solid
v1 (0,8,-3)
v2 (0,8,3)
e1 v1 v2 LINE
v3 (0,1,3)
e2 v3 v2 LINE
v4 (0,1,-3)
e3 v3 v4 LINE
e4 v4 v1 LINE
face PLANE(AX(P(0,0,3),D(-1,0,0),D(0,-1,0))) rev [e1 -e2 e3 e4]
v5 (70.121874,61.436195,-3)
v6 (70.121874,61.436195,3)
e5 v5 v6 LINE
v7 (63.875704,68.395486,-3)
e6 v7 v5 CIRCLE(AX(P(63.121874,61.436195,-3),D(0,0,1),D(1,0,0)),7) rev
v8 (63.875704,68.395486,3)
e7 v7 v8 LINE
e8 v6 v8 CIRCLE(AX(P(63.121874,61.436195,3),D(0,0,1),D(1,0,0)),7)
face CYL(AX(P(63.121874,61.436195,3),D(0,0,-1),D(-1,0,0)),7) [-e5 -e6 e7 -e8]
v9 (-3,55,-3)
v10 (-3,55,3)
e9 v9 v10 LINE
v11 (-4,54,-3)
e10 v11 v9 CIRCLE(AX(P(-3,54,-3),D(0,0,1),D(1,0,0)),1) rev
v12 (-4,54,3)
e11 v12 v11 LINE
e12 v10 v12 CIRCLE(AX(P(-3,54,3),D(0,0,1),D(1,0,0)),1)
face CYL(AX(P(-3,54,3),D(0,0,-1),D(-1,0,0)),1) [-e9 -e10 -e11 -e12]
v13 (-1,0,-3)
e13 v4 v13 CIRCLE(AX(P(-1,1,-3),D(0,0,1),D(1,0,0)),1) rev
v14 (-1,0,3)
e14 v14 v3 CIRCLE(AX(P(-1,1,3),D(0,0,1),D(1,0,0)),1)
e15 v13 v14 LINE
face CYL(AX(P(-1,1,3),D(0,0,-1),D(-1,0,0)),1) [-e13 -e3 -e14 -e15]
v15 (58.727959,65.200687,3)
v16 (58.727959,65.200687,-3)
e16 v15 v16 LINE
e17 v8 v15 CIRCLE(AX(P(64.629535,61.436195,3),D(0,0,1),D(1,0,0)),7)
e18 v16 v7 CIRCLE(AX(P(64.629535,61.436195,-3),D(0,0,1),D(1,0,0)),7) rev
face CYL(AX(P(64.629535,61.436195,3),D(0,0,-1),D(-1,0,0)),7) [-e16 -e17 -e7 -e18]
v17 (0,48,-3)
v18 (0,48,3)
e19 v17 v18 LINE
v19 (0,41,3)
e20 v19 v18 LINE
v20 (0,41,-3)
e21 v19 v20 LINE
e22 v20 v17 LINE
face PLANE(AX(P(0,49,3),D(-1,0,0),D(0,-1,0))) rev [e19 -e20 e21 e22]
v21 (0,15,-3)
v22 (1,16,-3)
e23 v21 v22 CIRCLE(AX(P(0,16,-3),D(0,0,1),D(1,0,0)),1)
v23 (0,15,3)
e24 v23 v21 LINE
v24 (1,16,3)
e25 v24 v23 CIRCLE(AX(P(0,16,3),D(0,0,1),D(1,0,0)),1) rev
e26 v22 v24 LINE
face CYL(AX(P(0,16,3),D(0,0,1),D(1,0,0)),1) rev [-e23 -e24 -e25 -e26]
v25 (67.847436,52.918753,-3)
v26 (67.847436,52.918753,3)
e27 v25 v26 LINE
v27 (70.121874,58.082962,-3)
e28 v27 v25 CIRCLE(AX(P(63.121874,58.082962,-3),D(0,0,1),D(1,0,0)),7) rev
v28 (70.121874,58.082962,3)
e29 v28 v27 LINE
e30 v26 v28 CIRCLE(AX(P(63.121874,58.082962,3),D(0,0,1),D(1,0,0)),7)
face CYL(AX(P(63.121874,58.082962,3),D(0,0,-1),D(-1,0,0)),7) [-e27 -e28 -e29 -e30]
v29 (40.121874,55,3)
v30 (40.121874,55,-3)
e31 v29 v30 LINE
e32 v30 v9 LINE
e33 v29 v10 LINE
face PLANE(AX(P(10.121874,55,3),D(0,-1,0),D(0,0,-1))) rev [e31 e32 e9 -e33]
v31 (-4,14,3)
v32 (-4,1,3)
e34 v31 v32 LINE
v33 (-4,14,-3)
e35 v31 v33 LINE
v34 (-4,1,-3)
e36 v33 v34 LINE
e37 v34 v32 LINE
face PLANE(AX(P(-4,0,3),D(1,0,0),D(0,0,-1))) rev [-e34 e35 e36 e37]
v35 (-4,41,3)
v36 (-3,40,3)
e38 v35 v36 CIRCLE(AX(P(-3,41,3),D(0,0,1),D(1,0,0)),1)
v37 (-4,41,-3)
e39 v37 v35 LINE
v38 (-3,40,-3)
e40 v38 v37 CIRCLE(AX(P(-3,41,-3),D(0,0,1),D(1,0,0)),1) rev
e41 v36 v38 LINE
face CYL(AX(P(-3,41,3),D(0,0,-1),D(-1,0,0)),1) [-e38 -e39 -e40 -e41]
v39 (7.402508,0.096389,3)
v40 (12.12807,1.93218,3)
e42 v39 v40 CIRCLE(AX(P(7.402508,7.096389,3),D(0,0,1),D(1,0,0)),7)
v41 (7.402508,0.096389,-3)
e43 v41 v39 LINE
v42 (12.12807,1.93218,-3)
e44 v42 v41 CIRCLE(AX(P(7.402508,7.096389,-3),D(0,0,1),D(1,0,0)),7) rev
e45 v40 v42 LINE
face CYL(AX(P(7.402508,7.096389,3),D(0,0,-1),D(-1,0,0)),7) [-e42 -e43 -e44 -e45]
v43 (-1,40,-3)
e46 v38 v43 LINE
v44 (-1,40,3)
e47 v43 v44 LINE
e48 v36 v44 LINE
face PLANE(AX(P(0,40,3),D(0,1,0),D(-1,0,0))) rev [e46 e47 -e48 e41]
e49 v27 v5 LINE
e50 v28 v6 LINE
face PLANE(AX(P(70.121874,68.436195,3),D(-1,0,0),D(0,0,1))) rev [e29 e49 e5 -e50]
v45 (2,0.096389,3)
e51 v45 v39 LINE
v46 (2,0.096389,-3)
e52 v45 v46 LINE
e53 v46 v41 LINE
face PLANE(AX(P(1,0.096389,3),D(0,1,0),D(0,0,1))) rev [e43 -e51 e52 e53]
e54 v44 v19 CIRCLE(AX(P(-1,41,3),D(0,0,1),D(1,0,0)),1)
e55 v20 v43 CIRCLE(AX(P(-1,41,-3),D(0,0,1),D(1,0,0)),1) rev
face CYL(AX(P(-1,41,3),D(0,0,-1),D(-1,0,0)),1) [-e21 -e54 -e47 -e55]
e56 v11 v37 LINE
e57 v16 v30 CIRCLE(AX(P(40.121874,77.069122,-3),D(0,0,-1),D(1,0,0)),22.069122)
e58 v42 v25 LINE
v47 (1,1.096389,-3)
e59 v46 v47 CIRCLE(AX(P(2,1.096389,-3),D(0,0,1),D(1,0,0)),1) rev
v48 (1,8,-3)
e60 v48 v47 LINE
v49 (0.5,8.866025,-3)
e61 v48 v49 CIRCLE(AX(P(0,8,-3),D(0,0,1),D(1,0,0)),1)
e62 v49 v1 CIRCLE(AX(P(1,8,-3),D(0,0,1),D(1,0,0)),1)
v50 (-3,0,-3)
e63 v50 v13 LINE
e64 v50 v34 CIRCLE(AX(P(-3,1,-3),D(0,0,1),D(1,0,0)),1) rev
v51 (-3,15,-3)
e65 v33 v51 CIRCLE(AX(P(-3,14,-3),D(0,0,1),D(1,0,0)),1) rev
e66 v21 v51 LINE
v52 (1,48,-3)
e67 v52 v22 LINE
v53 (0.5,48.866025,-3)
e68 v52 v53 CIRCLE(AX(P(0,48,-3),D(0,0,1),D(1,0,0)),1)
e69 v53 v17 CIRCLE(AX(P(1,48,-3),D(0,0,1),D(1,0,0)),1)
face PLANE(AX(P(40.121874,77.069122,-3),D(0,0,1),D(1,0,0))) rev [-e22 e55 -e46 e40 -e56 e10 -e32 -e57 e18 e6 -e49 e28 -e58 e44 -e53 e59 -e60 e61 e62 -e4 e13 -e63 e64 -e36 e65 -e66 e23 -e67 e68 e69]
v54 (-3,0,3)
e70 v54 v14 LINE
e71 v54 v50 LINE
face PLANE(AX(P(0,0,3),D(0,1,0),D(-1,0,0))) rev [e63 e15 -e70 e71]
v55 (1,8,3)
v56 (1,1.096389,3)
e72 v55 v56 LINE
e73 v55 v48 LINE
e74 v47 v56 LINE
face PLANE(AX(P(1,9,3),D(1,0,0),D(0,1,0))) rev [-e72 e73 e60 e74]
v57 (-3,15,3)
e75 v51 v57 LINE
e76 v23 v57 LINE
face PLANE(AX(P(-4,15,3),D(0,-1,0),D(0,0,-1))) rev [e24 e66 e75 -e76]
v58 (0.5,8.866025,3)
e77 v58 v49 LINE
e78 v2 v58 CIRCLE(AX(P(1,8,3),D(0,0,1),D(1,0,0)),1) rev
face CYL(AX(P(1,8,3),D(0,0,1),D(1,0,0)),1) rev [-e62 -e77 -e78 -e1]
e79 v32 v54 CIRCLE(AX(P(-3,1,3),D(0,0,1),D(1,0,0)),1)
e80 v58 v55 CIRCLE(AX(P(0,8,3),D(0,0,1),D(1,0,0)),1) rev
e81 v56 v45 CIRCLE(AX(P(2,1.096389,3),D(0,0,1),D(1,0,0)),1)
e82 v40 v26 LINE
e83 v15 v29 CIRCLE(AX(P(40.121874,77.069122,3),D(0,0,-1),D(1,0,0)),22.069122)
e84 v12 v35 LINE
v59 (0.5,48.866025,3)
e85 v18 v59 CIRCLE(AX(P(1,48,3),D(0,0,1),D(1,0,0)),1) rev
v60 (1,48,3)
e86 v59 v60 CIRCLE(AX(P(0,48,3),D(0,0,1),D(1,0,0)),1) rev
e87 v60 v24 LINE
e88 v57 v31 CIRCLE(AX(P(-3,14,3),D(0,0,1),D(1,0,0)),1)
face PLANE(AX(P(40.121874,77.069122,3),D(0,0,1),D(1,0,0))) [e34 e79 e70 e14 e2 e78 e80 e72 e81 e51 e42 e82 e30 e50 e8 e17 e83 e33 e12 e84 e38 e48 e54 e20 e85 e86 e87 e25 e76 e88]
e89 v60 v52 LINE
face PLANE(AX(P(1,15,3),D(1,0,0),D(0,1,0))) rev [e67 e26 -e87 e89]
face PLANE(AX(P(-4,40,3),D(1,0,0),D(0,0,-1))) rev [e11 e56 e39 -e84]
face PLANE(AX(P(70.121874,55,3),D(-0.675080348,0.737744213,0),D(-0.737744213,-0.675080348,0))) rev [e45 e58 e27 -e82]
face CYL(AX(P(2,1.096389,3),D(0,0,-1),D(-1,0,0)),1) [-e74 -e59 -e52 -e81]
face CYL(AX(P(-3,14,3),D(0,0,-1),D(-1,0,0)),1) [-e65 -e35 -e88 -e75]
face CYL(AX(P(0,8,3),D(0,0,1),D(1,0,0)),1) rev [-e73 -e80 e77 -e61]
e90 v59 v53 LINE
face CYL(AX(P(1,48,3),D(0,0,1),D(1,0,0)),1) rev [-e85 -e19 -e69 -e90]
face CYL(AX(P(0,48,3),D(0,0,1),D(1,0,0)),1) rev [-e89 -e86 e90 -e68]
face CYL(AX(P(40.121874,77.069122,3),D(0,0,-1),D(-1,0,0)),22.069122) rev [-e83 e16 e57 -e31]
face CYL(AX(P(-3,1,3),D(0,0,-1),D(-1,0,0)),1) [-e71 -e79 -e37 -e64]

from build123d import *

# Parameters (mm, degrees)
BOSS_EXTRU_1_DEPTH = 3
CONG_3_R           = 1
CONG_4_R           = 7


with BuildPart() as part:
    # Esquisse1 → Boss.-Extru.1 (new, symmetric)
    with BuildSketch(Plane.XY):
        with BuildLine():
            Line((0, 0), (0, 9))
            Line((0, 9), (1, 9))
            Line((1, 9), (1, 0.09638948))
            Line((1, 0.09638948), (10.121873618, 0.09638948))
            Line((10.121873618, 0.09638948), (70.121873618, 55))
            Line((70.121873618, 55), (70.121873618, 68.436194763))
            Line((70.121873618, 68.436194763), (60.432430442, 68.436194763))
            ThreePointArc((60.432430442, 68.436194763), (52.298183077, 58.663045958), (40.121873618, 55))
            Line((40.121873618, 55), (19.293191489, 55))
            Line((19.293191489, 55), (10.121873618, 55))
            Line((10.121873618, 55), (-4, 55))
            Line((-4, 55), (-4, 40))
            Line((-4, 40), (0, 40))
            Line((0, 40), (0, 49))
            Line((0, 49), (1, 49))
            Line((1, 49), (1, 15))
            Line((1, 15), (-4, 15))
            Line((-4, 15), (-4, 0))
            Line((-4, 0), (0, 0))
        make_face()
    extrude(amount=BOSS_EXTRU_1_DEPTH, both=True)

    # Congé3
    # the kernel refuses this fillet: 1 mm, written as the material it adds along each edge
    with BuildSketch(Plane(origin=(1, 9, -3), x_dir=(0, -1, 0), z_dir=(0, 0, 1)), Plane(origin=(1, 15, -3), x_dir=(-1, 0, 0), z_dir=(0, 0, 1)), Plane(origin=(1, 49, -3), x_dir=(0, -1, 0), z_dir=(0, 0, 1)), Plane(origin=(0, 49, -3), x_dir=(1, 0, 0), z_dir=(0, 0, 1))) as cong_3_piece_1:
        with BuildLine():
            CenterArc((CONG_3_R, -CONG_3_R), CONG_3_R, 90, 90)
            Line((0, -CONG_3_R), (0, 0))
            Line((0, 0), (CONG_3_R, 0))
        make_face()
    extrude(amount=6)
    with BuildSketch(Plane(origin=(0, 9, -3), x_dir=(0, -1, 0), z_dir=(0, 0, 1))) as cong_3_piece_2:
        with BuildLine():
            CenterArc((CONG_3_R, CONG_3_R), CONG_3_R, 180, 90)
            Line((0, CONG_3_R), (0, 0))
            Line((0, 0), (CONG_3_R, 0))
        make_face()
    extrude(amount=6)
    # the kernel refuses this fillet: 1 mm, written as the material it takes off along each edge
    with BuildSketch(Plane(origin=(1, 0.09638948, -5.5), x_dir=(0, 1, 0), z_dir=(0, 0, 1)), Plane(origin=(0, 0, 5.5), x_dir=(0, 1, 0), z_dir=(0, 0, -1)), Plane(origin=(-4, 0, 5.5), x_dir=(1, 0, 0), z_dir=(0, 0, -1)), Plane(origin=(-4, 15, 5.5), x_dir=(0, -1, 0), z_dir=(0, 0, -1)), Plane(origin=(0, 40, -5.5), x_dir=(-1, 0, 0), z_dir=(0, 0, 1)), Plane(origin=(-4, 40, -5.5), x_dir=(0, 1, 0), z_dir=(0, 0, 1)), Plane(origin=(-4, 55, -5.5), x_dir=(1, 0, 0), z_dir=(0, 0, 1))) as cong_3_2_piece_1:
        with BuildLine():
            CenterArc((CONG_3_R, -CONG_3_R), CONG_3_R, 90, 90)
            Line((0, -CONG_3_R), (0, 0))
            Line((0, 0), (CONG_3_R, 0))
        make_face()
    extrude(amount=11, mode=Mode.SUBTRACT)

    # Congé4
    # the kernel refuses this fillet: 7 mm, written as the material it takes off along each edge
    with BuildSketch(Plane(origin=(10.121873618, 0.09638948, -9.798414872), x_dir=(-1, 0, 0), z_dir=(0, 0, 1))) as cong_4_piece_1:
        with BuildLine():
            CenterArc((CONG_4_R * 0.388480849828, -CONG_4_R), CONG_4_R, 90, 42.460390035)
            Line((-CONG_4_R * 0.286599498638, -CONG_4_R * 0.262255787474), (0, 0))
            Line((0, 0), (CONG_4_R * 0.388480849828, 0))
        make_face()
    extrude(amount=19.596829744, mode=Mode.SUBTRACT)
    with BuildSketch(Plane(origin=(70.121873618, 55, -10.707405636), x_dir=(-0.7377442125256176, -0.6750803484659854, 0), z_dir=(0, 0, 1))) as cong_4_piece_2:
        with BuildLine():
            CenterArc((CONG_4_R * 0.440423179223, -CONG_4_R), CONG_4_R, 90, 47.539609965)
            Line((-CONG_4_R * 0.297321033302, -CONG_4_R * 0.324919651534), (0, 0))
            Line((0, 0), (CONG_4_R * 0.440423179223, 0))
        make_face()
    extrude(amount=21.414811273, mode=Mode.SUBTRACT)
    with BuildSketch(Plane(origin=(70.121873618, 68.436194763, -20.5), x_dir=(0, -1, 0), z_dir=(0, 0, 1))) as cong_4_piece_3:
        with BuildLine():
            CenterArc((CONG_4_R, -CONG_4_R), CONG_4_R, 90, 90)
            Line((0, -CONG_4_R), (0, 0))
            Line((0, 0), (CONG_4_R, 0))
        make_face()
    extrude(amount=41, mode=Mode.SUBTRACT)
    with BuildSketch(Plane(origin=(60.432430442, 68.436194763, -13.492760312), x_dir=(1, 0, 0), z_dir=(0, 0, 1))) as cong_4_piece_4:
        with BuildLine():
            CenterArc((4.197104125, -7), CONG_4_R, 90, 57.467043301)
            ThreePointArc((-1.704471625, -3.235507515), (-0.785102058, -1.653119949), (0, 0))
            Line((0, 0), (4.197104125, 0))
        make_face()
    extrude(amount=26.985520624, mode=Mode.SUBTRACT)


solid = part.part
